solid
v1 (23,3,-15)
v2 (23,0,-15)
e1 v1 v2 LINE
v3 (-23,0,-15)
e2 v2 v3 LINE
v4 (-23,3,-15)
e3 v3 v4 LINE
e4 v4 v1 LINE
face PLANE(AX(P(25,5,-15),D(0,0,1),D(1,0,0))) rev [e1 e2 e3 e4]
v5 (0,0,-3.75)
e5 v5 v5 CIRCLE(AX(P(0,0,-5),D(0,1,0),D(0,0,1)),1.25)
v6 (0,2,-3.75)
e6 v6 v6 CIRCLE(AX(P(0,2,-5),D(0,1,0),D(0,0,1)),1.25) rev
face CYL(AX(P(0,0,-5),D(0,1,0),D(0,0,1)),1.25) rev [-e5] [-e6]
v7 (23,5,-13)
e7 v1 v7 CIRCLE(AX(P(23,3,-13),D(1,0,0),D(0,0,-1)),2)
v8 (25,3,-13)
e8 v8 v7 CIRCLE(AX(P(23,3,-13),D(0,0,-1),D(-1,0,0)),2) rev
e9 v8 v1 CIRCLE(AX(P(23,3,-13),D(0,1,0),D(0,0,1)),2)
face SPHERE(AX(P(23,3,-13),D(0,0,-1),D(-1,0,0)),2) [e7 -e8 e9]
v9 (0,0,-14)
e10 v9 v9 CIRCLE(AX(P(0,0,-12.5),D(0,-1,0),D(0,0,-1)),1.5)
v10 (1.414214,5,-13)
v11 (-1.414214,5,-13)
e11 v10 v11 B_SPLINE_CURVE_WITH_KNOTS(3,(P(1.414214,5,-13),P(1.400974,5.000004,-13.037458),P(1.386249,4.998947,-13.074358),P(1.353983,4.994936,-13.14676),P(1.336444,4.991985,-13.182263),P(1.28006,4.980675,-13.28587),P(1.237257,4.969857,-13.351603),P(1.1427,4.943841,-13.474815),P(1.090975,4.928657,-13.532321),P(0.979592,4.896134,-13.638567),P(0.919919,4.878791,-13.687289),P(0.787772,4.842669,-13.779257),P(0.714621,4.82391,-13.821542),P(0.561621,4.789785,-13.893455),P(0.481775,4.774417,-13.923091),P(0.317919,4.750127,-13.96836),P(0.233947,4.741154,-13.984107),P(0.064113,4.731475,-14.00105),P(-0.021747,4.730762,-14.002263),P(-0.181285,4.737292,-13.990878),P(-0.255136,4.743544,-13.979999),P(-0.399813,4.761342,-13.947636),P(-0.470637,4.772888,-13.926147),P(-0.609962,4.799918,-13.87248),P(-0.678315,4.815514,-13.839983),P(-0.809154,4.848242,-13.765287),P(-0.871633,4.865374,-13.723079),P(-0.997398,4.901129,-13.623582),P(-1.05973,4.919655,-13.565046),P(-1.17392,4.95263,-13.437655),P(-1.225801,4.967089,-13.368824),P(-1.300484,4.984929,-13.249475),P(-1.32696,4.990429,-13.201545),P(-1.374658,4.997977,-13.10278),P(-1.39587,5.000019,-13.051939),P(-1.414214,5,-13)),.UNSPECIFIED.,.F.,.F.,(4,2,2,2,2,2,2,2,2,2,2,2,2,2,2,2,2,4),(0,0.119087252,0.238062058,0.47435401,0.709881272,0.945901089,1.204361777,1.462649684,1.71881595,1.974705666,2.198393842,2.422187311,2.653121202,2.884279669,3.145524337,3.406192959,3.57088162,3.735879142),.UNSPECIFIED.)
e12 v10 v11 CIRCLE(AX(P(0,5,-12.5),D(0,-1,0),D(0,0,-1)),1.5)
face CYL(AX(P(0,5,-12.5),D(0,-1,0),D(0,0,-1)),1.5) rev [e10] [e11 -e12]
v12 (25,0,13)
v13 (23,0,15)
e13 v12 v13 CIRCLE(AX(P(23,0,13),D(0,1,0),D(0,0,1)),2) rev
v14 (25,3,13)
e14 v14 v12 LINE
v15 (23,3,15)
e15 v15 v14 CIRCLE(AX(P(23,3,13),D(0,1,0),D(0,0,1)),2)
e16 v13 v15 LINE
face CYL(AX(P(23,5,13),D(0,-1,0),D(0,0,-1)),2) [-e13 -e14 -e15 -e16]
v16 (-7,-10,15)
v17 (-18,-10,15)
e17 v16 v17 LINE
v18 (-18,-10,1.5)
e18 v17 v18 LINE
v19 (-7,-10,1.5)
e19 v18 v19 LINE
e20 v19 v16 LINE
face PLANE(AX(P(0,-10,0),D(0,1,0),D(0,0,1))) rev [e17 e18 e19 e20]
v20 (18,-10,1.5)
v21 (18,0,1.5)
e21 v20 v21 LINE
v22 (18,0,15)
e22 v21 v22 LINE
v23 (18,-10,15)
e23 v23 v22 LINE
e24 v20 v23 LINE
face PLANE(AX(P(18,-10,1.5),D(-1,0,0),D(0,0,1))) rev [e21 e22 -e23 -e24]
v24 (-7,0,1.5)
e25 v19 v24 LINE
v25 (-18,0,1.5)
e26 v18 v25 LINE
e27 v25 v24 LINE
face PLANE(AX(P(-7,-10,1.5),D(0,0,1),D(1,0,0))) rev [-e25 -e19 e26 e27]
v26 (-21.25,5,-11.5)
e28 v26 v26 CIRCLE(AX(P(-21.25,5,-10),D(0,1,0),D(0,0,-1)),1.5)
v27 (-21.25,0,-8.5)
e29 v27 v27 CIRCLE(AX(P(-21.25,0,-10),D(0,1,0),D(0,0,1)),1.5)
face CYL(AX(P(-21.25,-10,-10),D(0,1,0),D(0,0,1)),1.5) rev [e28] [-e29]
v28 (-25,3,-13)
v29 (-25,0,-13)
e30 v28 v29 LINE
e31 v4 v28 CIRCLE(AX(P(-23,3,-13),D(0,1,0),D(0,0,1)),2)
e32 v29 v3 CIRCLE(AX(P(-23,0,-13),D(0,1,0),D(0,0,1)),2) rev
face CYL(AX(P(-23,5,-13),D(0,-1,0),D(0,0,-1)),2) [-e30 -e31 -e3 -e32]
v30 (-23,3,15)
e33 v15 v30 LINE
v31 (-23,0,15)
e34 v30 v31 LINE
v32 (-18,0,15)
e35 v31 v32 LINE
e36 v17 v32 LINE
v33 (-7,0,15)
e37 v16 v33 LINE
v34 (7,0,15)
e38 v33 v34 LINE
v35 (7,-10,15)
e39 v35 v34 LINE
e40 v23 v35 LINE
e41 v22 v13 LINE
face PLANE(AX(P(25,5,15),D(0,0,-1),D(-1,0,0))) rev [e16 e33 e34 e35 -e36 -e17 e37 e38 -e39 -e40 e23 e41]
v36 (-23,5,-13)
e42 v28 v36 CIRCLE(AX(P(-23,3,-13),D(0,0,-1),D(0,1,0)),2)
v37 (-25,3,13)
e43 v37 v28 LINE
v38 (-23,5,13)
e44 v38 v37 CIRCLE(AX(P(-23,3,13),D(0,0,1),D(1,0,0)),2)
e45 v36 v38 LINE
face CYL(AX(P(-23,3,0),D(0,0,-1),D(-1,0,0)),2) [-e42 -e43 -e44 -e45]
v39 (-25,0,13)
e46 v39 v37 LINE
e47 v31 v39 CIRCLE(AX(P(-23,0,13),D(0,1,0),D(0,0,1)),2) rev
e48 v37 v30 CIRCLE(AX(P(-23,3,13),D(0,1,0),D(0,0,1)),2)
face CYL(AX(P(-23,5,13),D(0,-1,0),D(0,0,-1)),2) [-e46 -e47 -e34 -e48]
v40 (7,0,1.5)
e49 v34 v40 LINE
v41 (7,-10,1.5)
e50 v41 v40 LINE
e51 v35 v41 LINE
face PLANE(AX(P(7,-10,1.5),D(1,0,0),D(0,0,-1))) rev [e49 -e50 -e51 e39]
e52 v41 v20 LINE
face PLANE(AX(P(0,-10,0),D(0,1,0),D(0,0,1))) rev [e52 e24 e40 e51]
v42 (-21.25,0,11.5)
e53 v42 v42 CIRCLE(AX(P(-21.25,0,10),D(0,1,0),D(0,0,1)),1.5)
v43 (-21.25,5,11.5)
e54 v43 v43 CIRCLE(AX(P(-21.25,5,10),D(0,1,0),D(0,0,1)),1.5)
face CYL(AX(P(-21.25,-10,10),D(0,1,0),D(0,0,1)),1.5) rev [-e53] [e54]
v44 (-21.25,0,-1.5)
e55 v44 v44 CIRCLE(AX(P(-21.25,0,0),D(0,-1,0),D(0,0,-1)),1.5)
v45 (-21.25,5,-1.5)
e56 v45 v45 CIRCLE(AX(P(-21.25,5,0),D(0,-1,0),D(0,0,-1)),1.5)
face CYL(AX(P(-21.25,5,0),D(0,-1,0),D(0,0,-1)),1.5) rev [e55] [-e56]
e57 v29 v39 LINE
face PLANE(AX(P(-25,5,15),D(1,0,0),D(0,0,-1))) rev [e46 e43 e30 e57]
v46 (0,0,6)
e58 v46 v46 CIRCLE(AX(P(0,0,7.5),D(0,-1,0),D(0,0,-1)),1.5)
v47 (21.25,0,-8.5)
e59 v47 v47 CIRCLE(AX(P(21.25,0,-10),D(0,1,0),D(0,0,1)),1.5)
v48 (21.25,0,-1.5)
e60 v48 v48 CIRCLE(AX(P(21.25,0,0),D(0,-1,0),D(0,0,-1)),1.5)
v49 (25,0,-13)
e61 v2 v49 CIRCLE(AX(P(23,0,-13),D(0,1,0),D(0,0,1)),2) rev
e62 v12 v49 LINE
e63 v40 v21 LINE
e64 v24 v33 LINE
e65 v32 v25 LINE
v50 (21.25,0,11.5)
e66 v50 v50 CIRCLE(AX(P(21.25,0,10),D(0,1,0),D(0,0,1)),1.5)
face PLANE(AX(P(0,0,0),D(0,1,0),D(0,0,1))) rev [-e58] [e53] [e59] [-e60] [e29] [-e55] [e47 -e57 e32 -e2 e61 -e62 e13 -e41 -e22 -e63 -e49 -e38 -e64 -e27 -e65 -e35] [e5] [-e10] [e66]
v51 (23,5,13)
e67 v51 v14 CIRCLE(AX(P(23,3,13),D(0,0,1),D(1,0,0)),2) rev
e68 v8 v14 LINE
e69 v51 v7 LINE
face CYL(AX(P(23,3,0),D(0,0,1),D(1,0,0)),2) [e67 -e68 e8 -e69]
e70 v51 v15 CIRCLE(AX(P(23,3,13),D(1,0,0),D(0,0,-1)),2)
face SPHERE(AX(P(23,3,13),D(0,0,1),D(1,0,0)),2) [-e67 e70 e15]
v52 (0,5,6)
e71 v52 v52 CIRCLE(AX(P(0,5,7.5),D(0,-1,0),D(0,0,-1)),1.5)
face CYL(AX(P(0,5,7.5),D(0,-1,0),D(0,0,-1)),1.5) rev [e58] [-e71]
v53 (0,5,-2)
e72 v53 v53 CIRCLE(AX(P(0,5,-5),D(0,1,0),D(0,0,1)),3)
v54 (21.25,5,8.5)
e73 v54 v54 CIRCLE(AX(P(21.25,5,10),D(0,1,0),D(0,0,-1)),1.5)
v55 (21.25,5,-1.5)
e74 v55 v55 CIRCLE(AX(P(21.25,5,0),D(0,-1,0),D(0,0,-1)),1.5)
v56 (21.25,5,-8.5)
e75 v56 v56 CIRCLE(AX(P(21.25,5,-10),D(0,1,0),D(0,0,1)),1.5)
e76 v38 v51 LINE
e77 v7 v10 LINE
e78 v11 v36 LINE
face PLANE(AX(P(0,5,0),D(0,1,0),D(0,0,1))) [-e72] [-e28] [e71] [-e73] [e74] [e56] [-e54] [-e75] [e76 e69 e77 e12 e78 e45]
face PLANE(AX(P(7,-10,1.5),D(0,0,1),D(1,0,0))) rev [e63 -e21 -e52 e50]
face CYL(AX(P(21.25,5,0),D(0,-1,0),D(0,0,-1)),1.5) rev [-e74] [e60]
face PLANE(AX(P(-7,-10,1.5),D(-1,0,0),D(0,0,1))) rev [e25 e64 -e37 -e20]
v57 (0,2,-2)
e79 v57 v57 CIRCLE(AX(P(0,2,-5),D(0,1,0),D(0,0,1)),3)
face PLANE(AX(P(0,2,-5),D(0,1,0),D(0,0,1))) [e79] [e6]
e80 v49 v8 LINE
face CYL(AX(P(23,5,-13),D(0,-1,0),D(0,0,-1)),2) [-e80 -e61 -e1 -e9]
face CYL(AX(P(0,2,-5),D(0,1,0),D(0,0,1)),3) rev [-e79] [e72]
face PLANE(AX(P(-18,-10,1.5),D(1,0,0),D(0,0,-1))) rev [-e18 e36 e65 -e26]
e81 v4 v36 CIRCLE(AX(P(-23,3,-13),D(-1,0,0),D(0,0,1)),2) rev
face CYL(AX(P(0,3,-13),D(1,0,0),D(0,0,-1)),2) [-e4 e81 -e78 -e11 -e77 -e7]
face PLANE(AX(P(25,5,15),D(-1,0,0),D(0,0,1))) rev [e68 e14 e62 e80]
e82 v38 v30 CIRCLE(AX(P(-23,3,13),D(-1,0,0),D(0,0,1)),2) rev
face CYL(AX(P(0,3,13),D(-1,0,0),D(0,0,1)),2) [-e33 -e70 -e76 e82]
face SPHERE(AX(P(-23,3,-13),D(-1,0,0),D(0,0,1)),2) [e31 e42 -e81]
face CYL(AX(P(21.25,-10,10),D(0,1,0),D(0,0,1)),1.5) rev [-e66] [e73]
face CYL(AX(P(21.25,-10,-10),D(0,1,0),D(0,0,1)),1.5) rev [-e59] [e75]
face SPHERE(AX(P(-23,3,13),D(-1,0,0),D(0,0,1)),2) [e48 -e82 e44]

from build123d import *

# Parameters (mm, degrees)
SKETCH_1_W          = 50
SKETCH_1_H          = 30
EXTRUDE_1_DEPTH     = 5
SKETCH_2_R          = 1.25
CUT_EXTRUDE_1_DEPTH = 30.580398915
SKETCH_3_R          = 1.5
CUT_EXTRUDE_2_DEPTH = 30.580398915
SKETCH_4_W          = 11
SKETCH_4_H          = 13.5
EXTRUDE_2_DEPTH     = 10
SKETCH_5_R          = 1.5
CUT_EXTRUDE_3_DEPTH = 33.787192622
FILLET_1_R          = 2
SKETCH_6_R          = 3
CUT_EXTRUDE_4_DEPTH = 3


with BuildPart() as part:
    # Эскиз1 → Бобышка-Вытянуть1 (new body)
    with BuildSketch(Plane(origin=(0, 0, 0), x_dir=(1, 0, 0), z_dir=(0, 1, 0))):
        Rectangle(SKETCH_1_W, SKETCH_1_H)
    extrude(amount=EXTRUDE_1_DEPTH)

    # Эскиз2 → Вырез-Вытянуть1 (cut, through all)
    with BuildSketch(Plane(origin=(0, 5, 0), x_dir=(1, 0, 0), z_dir=(0, 1, 0))):
        with Locations(Location((0, 5, 0), (0, 0, 270))):
            Circle(SKETCH_2_R)
    extrude(amount=-CUT_EXTRUDE_1_DEPTH, mode=Mode.SUBTRACT)

    # Эскиз3 → Вырез-Вытянуть2 (cut, through all)
    with BuildSketch(Plane.XZ):
        with Locations(Location((-21.25, 0, 0), (0, 0, 270))):
            Circle(SKETCH_3_R)
        with Locations(Location((0, 7.5, 0), (0, 0, 270))):
            Circle(SKETCH_3_R)
        with Locations(Location((21.25, 0, 0), (0, 0, 270))):
            Circle(SKETCH_3_R)
        with Locations(Location((0, -12.5, 0), (0, 0, 270))):
            Circle(SKETCH_3_R)
    extrude(amount=-CUT_EXTRUDE_2_DEPTH, mode=Mode.SUBTRACT)

    # Эскиз4 → Бобышка-Вытянуть2 (add)
    with BuildSketch(Plane.XZ):
        with Locations((-12.5, 8.25)):
            Rectangle(SKETCH_4_W, SKETCH_4_H)
        with Locations((12.5, 8.25)):
            Rectangle(SKETCH_4_W, SKETCH_4_H)
    extrude(amount=EXTRUDE_2_DEPTH)

    # Эскиз5 → Вырез-Вытянуть3 (cut, through all)
    with BuildSketch(Plane(origin=(0, 5, 0), x_dir=(1, 0, 0), z_dir=(0, 1, 0))):
        with Locations(Location((-21.25, -10, 0), (0, 0, 270))):
            Circle(SKETCH_5_R)
        with Locations(Location((-21.25, 10, 0), (0, 0, 270))):
            Circle(SKETCH_5_R)
        with Locations(Location((21.25, -10, 0), (0, 0, 270))):
            Circle(SKETCH_5_R)
        with Locations(Location((21.25, 10, 0), (0, 0, 270))):
            Circle(SKETCH_5_R)
    extrude(amount=-CUT_EXTRUDE_3_DEPTH, mode=Mode.SUBTRACT)

    # Скругление1
    # the kernel refuses this fillet: 2 mm, written as the material it takes off along each edge
    with BuildSketch(Plane(origin=(23, 3, -13), x_dir=(0, 1, 0), z_dir=(1, 0, 0))) as fillet_1_piece_1_section:
        Polygon((0, 0), (FILLET_1_R, 0), (FILLET_1_R, -FILLET_1_R), (0, -FILLET_1_R), align=None)
    fillet_1_piece_1 = extrude(amount=FILLET_1_R, mode=Mode.PRIVATE)
    fillet_1_piece_1 = fillet_1_piece_1 - Plane(origin=(23, 3, -13), x_dir=(0, -0.7071067811865475, 0.7071067811865475), z_dir=(1, 0, 0)) * Sphere(FILLET_1_R, mode=Mode.PRIVATE)
    add(fillet_1_piece_1, mode=Mode.SUBTRACT)
    with BuildSketch(Plane(origin=(23, 3, 13), x_dir=(1, 0, 0), z_dir=(0, 0, 1))) as fillet_1_piece_2_section:
        Polygon((0, 0), (FILLET_1_R, 0), (FILLET_1_R, FILLET_1_R), (0, FILLET_1_R), align=None)
    fillet_1_piece_2 = extrude(amount=FILLET_1_R, mode=Mode.PRIVATE)
    fillet_1_piece_2 = fillet_1_piece_2 - Plane(origin=(23, 3, 13), x_dir=(-0.7071067811865475, -0.7071067811865475, 0), z_dir=(0, 0, 1)) * Sphere(FILLET_1_R, mode=Mode.PRIVATE)
    add(fillet_1_piece_2, mode=Mode.SUBTRACT)
    with BuildSketch(Plane(origin=(-23, 3, -13), x_dir=(0, 1, 0), z_dir=(-1, 0, 0))) as fillet_1_piece_3_section:
        Polygon((0, 0), (FILLET_1_R, 0), (FILLET_1_R, FILLET_1_R), (0, FILLET_1_R), align=None)
    fillet_1_piece_3 = extrude(amount=FILLET_1_R, mode=Mode.PRIVATE)
    fillet_1_piece_3 = fillet_1_piece_3 - Plane(origin=(-23, 3, -13), x_dir=(0, -0.7071067811865475, 0.7071067811865475), z_dir=(-1, 0, 0)) * Sphere(FILLET_1_R, mode=Mode.PRIVATE)
    add(fillet_1_piece_3, mode=Mode.SUBTRACT)
    with BuildSketch(Plane(origin=(-23, 3, 13), x_dir=(0, 1, 0), z_dir=(0, 0, 1))) as fillet_1_piece_4_section:
        Polygon((0, 0), (FILLET_1_R, 0), (FILLET_1_R, FILLET_1_R), (0, FILLET_1_R), align=None)
    fillet_1_piece_4 = extrude(amount=FILLET_1_R, mode=Mode.PRIVATE)
    fillet_1_piece_4 = fillet_1_piece_4 - Plane(origin=(-23, 3, 13), x_dir=(0.7071067811865475, -0.7071067811865475, 0), z_dir=(0, 0, 1)) * Sphere(FILLET_1_R, mode=Mode.PRIVATE)
    add(fillet_1_piece_4, mode=Mode.SUBTRACT)
    with BuildSketch(Plane(origin=(25, 5, -13), x_dir=(0, -1, 0), z_dir=(0, 0, 1))) as fillet_1_piece_5:
        with BuildLine():
            CenterArc((FILLET_1_R, -FILLET_1_R), FILLET_1_R, 90, 90)
            Line((0, -FILLET_1_R), (0, 0))
            Line((0, 0), (FILLET_1_R, 0))
        make_face()
    extrude(amount=26, mode=Mode.SUBTRACT)
    with BuildSketch(Plane(origin=(-23, 5, -15), x_dir=(0, 0, 1), z_dir=(1, 0, 0))) as fillet_1_piece_6:
        with BuildLine():
            CenterArc((FILLET_1_R, FILLET_1_R), FILLET_1_R, 180, 90)
            Line((0, FILLET_1_R), (0, 0))
            Line((0, 0), (FILLET_1_R, 0))
        make_face()
    extrude(amount=46, mode=Mode.SUBTRACT)
    with BuildSketch(Plane(origin=(-25, 5, 13), x_dir=(1, 0, 0), z_dir=(0, 0, -1))) as fillet_1_piece_7:
        with BuildLine():
            CenterArc((FILLET_1_R, FILLET_1_R), FILLET_1_R, 180, 90)
            Line((0, FILLET_1_R), (0, 0))
            Line((0, 0), (FILLET_1_R, 0))
        make_face()
    extrude(amount=26, mode=Mode.SUBTRACT)
    with BuildSketch(Plane(origin=(-25, -5, -15), x_dir=(0, 0, 1), z_dir=(0, 1, 0)), Plane(origin=(-25, -5, 15), x_dir=(1, 0, 0), z_dir=(0, 1, 0))) as fillet_1_piece_8:
        with BuildLine():
            CenterArc((FILLET_1_R, FILLET_1_R), FILLET_1_R, 180, 90)
            Line((0, FILLET_1_R), (0, 0))
            Line((0, 0), (FILLET_1_R, 0))
        make_face()
    extrude(amount=8, mode=Mode.SUBTRACT)
    with BuildSketch(Plane(origin=(25, -5, -15), x_dir=(0, 0, 1), z_dir=(0, 1, 0)), Plane(origin=(25, -5, 15), x_dir=(-1, 0, 0), z_dir=(0, 1, 0))) as fillet_1_piece_9:
        with BuildLine():
            CenterArc((FILLET_1_R, -FILLET_1_R), FILLET_1_R, 90, 90)
            Line((0, -FILLET_1_R), (0, 0))
            Line((0, 0), (FILLET_1_R, 0))
        make_face()
    extrude(amount=8, mode=Mode.SUBTRACT)
    with BuildSketch(Plane(origin=(23, 5, 15), x_dir=(0, -1, 0), z_dir=(-1, 0, 0))) as fillet_1_piece_10:
        with BuildLine():
            CenterArc((FILLET_1_R, -FILLET_1_R), FILLET_1_R, 90, 90)
            Line((0, -FILLET_1_R), (0, 0))
            Line((0, 0), (FILLET_1_R, 0))
        make_face()
    extrude(amount=46, mode=Mode.SUBTRACT)

    # Эскиз6 → Вырез-Вытянуть4 (cut)
    with BuildSketch(Plane(origin=(0, 5, 0), x_dir=(1, 0, 0), z_dir=(0, 1, 0))):
        with Locations(Location((0, 5, 0), (0, 0, 270))):
            Circle(SKETCH_6_R)
    extrude(amount=-CUT_EXTRUDE_4_DEPTH, mode=Mode.SUBTRACT)


solid = part.part
